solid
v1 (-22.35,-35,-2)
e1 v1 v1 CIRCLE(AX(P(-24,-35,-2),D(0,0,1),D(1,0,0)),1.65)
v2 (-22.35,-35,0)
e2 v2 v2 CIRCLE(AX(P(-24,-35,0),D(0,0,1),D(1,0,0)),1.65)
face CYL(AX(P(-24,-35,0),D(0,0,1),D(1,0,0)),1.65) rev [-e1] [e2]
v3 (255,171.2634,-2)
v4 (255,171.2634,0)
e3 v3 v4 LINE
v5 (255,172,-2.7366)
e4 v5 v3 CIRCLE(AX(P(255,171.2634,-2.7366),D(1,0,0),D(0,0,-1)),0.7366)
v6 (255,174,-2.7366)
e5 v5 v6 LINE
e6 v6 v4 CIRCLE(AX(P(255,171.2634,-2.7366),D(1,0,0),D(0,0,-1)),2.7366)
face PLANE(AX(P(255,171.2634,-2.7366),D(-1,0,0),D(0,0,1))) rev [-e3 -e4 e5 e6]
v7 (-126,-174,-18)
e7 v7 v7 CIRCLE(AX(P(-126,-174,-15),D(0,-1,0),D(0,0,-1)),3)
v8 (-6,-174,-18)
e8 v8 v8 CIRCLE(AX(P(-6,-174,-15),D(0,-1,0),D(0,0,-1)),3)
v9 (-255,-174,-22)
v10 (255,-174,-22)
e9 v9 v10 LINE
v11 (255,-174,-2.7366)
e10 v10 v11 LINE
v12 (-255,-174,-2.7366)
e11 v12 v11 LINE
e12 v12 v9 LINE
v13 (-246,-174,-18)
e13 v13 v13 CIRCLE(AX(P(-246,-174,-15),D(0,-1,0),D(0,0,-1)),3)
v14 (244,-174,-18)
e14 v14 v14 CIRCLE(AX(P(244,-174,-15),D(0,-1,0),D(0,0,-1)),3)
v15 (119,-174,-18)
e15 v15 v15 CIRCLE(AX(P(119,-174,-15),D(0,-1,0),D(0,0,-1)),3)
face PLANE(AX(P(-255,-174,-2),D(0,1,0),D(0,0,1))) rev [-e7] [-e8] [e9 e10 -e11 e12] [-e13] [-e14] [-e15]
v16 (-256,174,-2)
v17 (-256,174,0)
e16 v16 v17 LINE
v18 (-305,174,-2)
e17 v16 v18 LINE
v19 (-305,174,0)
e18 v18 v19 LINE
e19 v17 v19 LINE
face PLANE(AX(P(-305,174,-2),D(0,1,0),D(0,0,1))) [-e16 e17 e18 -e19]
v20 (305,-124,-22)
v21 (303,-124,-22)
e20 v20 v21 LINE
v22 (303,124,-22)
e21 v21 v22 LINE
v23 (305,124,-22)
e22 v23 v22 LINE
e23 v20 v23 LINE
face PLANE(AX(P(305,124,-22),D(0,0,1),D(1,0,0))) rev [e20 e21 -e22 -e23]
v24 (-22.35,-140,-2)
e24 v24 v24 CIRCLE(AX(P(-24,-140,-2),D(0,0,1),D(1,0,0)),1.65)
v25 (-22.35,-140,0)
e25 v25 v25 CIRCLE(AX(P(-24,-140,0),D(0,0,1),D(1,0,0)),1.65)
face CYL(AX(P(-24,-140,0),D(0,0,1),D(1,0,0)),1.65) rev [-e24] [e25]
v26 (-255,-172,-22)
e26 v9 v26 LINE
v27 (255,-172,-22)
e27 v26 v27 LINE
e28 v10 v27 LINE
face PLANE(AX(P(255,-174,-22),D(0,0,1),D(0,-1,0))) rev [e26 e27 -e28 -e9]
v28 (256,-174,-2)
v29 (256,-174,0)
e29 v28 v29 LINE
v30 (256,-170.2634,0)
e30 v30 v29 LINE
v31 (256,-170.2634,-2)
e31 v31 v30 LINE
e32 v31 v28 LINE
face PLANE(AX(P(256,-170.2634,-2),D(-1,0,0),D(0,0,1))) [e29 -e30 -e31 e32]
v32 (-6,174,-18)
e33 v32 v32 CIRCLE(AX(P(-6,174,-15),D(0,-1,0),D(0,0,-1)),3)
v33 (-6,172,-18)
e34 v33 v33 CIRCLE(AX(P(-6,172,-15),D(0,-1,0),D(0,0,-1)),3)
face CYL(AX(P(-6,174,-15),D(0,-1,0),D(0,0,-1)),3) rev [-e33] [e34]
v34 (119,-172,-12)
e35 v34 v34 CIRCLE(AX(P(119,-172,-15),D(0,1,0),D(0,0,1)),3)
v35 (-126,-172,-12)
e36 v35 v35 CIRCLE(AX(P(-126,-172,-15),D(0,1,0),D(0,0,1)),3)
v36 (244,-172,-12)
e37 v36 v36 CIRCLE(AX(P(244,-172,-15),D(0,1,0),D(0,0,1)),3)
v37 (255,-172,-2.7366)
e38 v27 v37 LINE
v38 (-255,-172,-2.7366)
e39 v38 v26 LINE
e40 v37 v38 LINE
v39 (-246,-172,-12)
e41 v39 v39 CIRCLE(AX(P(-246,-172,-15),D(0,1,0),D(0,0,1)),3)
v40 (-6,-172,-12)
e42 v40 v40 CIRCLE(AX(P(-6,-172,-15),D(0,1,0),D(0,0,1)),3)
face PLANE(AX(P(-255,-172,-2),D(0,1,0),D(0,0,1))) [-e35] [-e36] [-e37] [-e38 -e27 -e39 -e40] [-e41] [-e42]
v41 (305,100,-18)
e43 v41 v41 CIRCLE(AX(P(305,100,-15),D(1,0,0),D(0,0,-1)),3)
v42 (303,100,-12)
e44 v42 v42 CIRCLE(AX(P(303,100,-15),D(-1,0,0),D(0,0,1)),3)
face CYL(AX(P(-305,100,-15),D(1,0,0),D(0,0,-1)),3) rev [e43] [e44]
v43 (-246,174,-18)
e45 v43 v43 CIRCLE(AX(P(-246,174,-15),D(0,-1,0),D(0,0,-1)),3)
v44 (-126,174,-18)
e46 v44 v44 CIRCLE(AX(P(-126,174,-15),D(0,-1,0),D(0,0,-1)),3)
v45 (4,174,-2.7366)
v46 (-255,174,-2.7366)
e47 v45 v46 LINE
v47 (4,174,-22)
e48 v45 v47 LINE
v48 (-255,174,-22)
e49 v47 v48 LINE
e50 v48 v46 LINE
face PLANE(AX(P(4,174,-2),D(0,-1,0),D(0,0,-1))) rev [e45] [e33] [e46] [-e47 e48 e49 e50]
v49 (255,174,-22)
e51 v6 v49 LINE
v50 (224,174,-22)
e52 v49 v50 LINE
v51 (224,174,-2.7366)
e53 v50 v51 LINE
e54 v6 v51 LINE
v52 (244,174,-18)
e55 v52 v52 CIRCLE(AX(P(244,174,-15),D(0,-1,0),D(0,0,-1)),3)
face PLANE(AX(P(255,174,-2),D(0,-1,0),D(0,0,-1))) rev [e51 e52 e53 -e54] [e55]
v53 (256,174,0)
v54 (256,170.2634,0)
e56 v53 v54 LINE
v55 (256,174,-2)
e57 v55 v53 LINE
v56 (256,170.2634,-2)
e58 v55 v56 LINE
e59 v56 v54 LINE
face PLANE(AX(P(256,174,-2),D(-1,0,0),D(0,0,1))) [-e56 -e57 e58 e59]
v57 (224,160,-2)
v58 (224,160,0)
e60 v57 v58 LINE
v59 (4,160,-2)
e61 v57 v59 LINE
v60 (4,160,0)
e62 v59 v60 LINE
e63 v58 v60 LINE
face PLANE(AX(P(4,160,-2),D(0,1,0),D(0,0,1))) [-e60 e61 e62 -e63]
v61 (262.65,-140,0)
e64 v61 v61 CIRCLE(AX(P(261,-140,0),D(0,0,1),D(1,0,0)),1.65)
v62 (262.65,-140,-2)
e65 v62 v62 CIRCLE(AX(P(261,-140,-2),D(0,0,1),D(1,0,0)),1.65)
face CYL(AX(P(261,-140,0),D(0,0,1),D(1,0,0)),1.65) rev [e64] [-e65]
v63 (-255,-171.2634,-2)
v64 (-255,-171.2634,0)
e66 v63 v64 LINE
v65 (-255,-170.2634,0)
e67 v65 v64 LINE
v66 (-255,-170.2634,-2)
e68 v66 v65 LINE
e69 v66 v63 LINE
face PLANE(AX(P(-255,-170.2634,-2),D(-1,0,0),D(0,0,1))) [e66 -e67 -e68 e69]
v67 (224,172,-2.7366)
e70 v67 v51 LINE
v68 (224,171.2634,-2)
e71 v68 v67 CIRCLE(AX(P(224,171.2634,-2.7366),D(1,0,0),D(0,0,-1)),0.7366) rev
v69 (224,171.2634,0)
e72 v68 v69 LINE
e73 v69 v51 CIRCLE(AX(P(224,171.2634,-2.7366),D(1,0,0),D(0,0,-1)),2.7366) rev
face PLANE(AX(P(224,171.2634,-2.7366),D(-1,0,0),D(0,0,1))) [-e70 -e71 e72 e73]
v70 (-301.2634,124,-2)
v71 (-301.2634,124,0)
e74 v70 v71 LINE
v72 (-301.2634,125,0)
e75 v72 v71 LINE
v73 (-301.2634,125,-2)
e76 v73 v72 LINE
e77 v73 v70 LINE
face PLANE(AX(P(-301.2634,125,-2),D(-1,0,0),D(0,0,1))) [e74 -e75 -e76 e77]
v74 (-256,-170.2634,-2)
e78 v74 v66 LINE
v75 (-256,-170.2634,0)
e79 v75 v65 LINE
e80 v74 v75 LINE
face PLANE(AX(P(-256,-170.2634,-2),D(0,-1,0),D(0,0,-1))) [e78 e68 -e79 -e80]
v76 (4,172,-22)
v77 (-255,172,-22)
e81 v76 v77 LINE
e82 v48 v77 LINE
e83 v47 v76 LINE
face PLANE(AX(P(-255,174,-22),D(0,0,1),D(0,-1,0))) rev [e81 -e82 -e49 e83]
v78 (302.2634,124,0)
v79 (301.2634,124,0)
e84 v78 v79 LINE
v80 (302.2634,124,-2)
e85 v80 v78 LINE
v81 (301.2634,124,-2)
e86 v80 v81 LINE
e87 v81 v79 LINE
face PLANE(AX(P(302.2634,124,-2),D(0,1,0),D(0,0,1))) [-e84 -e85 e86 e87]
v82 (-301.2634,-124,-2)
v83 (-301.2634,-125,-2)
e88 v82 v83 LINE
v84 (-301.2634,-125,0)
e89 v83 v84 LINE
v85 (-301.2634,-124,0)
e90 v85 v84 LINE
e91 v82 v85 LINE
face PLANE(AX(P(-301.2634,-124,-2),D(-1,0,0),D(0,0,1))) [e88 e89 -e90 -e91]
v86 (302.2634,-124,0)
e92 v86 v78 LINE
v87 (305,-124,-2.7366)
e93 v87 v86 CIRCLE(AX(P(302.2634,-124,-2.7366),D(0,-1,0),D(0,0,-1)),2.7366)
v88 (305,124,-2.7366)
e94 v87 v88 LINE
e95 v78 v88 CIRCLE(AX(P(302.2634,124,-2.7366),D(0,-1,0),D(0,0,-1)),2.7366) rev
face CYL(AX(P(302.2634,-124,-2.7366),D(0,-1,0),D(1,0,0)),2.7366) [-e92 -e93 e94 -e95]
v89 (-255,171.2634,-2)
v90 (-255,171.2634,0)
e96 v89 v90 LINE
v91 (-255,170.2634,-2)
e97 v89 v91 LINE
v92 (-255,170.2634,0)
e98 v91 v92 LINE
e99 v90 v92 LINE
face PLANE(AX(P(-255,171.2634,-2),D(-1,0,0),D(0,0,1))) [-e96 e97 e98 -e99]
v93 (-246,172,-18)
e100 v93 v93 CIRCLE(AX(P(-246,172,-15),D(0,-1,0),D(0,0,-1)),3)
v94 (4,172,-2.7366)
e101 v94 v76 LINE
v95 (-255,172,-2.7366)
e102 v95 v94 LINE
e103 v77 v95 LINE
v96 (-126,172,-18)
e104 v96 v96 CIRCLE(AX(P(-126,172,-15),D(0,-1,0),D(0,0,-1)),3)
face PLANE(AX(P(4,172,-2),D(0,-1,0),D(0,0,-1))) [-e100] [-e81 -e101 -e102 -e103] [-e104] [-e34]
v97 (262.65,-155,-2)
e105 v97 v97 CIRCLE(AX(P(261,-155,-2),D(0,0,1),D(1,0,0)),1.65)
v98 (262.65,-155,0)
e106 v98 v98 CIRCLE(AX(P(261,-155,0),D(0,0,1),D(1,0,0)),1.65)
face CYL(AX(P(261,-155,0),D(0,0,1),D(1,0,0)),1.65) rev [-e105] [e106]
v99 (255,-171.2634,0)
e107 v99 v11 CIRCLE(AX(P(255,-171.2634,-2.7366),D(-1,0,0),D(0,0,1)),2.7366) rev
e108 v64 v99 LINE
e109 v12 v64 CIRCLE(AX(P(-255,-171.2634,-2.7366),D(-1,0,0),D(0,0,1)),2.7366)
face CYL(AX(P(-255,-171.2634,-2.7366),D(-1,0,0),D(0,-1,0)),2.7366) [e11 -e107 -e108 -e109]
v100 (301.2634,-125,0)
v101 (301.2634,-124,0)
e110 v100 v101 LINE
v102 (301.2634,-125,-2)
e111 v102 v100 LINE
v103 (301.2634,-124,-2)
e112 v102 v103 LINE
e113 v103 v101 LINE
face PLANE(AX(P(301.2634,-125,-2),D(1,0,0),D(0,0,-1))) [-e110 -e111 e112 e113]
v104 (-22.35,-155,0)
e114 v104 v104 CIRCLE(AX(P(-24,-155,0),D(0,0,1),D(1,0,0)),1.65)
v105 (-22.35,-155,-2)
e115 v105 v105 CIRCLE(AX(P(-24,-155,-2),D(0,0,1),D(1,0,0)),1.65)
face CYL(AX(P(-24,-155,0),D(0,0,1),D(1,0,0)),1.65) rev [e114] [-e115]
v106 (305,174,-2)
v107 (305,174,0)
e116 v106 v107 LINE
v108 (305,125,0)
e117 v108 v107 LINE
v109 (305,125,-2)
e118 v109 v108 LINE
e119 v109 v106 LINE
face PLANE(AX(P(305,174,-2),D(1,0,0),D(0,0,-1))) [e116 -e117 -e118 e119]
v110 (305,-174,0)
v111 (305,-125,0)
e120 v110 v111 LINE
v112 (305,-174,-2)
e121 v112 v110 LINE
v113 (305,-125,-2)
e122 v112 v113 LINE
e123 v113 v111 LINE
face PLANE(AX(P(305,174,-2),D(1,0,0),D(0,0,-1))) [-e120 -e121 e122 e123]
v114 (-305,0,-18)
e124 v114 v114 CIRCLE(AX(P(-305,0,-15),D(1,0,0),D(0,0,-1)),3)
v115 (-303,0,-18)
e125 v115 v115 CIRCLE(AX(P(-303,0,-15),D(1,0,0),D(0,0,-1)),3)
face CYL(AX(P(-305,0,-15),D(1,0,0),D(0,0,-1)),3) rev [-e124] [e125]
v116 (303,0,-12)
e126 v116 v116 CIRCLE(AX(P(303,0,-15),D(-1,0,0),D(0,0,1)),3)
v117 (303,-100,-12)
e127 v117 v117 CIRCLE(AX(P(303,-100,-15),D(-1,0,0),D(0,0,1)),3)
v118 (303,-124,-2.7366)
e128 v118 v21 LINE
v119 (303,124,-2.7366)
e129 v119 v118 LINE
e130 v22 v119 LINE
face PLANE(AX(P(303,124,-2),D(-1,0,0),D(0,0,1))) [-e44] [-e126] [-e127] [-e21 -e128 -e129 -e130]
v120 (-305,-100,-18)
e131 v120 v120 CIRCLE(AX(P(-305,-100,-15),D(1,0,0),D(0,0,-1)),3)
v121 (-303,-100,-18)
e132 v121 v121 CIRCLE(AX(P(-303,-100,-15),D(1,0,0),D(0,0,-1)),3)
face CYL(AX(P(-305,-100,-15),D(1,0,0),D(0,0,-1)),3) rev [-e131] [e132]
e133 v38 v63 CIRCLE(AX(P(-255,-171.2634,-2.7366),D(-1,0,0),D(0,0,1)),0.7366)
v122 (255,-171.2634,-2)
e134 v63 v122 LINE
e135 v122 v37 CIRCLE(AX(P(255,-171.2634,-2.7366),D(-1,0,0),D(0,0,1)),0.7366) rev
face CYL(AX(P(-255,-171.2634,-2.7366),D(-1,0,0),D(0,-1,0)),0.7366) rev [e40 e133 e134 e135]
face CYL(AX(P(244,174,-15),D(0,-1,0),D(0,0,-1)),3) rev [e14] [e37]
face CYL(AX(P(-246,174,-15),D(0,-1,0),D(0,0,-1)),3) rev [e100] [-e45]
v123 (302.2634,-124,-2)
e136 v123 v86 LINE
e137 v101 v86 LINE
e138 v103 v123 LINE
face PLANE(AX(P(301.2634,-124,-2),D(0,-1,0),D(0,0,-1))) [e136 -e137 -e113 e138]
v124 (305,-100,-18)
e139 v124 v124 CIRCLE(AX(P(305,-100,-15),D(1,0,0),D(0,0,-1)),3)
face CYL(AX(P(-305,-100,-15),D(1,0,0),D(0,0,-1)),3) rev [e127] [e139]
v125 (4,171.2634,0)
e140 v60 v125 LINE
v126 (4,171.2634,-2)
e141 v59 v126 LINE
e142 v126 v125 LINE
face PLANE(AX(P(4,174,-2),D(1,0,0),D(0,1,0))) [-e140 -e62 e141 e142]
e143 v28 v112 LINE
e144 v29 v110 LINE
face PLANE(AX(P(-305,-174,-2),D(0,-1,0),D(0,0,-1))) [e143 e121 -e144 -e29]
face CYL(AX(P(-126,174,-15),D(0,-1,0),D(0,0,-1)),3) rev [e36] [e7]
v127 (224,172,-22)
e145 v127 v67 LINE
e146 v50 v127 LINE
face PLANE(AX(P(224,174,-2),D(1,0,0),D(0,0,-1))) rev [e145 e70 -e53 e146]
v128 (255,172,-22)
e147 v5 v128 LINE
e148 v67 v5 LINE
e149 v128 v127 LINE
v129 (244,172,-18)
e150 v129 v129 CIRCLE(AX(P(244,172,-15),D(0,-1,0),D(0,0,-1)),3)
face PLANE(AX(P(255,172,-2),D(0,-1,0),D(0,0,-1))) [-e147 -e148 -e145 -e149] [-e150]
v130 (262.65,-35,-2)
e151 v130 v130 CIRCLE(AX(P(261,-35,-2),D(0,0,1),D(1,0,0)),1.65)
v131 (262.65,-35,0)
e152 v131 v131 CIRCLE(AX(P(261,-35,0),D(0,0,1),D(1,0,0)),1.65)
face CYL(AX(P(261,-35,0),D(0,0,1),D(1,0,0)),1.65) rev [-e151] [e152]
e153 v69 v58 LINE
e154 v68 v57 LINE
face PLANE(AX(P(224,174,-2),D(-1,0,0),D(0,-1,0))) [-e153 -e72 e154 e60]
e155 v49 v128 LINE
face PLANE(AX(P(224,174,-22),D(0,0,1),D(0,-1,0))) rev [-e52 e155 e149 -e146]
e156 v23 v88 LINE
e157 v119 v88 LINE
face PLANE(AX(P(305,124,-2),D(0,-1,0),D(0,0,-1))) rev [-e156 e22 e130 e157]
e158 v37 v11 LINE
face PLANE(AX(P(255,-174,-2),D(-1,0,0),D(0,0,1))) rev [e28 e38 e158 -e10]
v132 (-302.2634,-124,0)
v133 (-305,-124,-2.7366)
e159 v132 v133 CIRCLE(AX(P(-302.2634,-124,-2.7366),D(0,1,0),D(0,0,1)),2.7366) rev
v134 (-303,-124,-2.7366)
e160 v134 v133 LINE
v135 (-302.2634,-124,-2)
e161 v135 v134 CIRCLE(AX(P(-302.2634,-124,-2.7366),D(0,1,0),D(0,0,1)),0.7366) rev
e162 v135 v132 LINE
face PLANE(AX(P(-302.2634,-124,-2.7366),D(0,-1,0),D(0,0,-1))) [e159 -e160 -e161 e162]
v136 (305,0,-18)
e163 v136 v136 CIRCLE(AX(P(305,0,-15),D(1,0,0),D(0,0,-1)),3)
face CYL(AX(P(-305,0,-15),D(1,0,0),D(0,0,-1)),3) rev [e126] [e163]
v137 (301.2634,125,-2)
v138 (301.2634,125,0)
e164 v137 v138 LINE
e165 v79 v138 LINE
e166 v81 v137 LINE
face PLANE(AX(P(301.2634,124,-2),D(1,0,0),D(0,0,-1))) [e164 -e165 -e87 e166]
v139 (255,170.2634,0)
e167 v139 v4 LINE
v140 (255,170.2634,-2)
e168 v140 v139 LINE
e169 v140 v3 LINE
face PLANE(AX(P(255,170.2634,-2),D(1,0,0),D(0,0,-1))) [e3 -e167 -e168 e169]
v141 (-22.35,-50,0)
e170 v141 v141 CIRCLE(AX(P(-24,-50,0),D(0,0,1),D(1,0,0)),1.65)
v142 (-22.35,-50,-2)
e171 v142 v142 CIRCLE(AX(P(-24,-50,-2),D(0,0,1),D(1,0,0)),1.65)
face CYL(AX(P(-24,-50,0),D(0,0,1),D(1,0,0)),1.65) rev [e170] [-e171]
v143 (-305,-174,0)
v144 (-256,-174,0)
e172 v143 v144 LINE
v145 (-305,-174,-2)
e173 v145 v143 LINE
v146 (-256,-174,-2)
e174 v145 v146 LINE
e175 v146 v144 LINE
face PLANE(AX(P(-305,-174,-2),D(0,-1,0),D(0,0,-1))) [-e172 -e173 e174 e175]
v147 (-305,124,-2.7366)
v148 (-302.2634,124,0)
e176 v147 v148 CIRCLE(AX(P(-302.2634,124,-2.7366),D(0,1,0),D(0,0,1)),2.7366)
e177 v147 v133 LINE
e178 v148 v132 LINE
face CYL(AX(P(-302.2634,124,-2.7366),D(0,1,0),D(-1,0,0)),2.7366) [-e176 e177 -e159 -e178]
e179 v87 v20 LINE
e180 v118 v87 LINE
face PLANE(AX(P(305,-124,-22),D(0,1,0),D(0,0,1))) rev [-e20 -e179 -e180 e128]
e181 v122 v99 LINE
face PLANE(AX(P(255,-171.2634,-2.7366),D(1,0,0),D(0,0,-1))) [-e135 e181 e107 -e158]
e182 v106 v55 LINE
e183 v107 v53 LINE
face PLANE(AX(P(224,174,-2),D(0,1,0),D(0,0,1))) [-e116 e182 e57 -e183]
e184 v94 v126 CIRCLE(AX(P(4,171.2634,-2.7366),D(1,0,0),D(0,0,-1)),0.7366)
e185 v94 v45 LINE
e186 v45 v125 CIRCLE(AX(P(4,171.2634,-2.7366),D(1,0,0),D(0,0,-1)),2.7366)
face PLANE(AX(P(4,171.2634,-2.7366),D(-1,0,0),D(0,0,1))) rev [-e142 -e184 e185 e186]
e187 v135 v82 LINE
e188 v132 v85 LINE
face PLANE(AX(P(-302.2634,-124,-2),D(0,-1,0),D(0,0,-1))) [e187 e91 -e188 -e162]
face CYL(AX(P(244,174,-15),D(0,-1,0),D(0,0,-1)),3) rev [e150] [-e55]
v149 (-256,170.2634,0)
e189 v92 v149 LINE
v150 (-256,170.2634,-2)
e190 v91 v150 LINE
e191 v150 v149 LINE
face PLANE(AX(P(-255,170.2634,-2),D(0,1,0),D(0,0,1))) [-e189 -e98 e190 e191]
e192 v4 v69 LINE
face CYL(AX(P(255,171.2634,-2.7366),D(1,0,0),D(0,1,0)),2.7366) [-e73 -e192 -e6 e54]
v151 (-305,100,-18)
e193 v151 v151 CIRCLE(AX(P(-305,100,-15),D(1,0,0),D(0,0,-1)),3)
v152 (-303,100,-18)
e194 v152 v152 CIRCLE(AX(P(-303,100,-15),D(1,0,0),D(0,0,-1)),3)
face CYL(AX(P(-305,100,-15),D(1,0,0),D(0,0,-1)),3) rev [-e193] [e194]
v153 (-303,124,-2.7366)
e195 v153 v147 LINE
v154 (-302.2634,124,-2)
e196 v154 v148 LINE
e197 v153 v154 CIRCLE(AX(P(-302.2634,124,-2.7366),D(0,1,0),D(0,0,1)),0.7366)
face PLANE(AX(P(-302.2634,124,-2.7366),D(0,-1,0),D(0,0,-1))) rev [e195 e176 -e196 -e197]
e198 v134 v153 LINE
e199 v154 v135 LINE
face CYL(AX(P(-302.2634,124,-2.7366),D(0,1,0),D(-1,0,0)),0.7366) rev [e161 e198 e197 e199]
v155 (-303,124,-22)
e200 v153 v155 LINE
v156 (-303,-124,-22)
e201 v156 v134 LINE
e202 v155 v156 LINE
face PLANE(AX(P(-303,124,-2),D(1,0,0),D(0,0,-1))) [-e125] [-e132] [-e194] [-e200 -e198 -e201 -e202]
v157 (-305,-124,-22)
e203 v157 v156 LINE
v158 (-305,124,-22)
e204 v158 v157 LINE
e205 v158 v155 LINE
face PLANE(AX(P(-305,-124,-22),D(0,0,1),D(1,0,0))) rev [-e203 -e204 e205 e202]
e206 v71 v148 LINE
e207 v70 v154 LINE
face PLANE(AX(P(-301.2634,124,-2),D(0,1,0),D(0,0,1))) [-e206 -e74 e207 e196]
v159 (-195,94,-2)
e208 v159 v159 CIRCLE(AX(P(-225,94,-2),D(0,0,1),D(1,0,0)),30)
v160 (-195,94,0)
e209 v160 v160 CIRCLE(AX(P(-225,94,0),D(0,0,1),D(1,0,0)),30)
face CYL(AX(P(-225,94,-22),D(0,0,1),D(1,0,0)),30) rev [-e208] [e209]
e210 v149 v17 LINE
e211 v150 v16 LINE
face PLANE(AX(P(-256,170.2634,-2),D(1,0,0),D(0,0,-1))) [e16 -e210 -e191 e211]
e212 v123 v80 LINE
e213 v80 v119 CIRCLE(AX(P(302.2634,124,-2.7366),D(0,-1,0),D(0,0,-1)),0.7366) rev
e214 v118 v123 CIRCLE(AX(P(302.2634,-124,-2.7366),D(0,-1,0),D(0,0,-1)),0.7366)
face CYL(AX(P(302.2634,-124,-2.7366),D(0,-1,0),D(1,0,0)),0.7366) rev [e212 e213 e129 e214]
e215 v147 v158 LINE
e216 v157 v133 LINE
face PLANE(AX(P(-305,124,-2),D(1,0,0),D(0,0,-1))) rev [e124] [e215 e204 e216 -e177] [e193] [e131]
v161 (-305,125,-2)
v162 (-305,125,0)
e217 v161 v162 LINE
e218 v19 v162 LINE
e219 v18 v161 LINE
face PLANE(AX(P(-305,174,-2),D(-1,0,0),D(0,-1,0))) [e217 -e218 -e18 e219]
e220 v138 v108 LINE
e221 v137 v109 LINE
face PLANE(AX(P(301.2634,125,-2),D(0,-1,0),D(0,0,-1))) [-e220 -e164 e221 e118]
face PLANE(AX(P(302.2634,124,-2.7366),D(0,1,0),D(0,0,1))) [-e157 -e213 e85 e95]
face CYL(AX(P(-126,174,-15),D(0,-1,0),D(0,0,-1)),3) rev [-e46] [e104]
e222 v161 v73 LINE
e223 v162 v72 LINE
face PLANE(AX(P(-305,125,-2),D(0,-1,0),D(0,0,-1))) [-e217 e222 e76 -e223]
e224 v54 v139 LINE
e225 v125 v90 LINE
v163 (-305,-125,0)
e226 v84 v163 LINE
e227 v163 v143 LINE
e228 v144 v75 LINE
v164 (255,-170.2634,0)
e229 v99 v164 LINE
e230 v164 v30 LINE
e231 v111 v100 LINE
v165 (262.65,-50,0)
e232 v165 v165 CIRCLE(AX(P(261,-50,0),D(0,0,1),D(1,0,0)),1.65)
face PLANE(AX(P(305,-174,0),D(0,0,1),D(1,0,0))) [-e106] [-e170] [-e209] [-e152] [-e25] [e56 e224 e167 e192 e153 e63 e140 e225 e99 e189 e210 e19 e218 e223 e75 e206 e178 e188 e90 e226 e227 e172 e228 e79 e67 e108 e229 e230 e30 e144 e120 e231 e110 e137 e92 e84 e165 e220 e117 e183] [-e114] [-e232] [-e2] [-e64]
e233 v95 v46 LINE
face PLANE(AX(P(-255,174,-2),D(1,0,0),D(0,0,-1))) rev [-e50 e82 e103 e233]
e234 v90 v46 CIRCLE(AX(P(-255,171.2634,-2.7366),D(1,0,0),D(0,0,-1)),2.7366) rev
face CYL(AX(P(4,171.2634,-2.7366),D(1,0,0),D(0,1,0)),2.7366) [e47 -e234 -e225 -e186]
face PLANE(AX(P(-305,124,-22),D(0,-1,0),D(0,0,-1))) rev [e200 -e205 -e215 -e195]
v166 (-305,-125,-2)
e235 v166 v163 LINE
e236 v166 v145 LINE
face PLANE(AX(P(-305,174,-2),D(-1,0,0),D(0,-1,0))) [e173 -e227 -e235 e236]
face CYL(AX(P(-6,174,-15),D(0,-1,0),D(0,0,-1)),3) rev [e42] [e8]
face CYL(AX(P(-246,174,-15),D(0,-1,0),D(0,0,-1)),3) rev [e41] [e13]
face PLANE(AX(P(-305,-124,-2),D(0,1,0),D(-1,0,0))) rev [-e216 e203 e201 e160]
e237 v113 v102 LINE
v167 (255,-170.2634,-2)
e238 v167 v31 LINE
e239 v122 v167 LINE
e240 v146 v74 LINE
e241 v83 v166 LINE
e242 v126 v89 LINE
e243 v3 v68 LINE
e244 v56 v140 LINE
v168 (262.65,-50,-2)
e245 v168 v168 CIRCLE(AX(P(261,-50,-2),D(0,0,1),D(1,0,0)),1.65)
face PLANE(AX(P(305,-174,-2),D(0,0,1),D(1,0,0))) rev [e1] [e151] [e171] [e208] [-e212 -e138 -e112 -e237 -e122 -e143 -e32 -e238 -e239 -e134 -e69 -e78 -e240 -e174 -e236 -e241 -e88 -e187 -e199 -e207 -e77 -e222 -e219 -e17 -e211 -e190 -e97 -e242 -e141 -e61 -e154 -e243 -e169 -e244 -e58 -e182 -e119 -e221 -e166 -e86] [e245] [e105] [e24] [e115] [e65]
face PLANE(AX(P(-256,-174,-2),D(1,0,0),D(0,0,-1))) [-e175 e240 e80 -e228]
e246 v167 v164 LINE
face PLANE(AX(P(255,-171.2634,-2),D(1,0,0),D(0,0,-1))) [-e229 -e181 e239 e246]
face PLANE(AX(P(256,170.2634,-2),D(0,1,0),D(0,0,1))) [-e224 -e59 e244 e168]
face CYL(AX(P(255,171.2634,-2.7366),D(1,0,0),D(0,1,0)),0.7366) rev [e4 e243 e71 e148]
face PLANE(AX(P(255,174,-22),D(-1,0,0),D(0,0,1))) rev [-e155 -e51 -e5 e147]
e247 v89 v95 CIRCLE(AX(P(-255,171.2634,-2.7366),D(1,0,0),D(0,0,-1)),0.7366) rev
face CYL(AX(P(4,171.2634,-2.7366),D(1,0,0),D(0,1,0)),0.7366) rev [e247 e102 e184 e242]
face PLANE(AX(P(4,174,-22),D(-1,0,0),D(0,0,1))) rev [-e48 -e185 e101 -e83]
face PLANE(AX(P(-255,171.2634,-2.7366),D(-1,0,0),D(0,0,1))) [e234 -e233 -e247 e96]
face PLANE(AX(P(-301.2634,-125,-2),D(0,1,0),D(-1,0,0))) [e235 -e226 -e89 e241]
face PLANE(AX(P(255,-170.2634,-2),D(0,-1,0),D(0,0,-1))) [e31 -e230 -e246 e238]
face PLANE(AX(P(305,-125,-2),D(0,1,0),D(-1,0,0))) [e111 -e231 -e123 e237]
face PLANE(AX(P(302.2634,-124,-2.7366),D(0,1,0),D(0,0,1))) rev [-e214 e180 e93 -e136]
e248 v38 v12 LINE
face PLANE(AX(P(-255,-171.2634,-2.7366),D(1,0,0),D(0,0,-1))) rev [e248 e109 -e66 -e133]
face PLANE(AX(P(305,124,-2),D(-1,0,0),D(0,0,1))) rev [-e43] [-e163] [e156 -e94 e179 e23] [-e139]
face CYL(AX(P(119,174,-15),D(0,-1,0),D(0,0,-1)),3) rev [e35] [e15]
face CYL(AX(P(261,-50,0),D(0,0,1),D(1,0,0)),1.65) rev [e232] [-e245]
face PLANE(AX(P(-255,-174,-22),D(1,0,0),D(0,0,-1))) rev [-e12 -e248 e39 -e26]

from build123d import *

# Parameters (mm, degrees)
SM_BASE_FLANGE_1_DEPTH            = 2
SM_EDGE_FLANGE_1_STRIP_W          = 9.4732
SM_EDGE_FLANGE_1_STRIP_H          = 2
SM_EDGE_FLANGE_1_STRIP_CUT_DEPTH  = 248
SM_EDGE_FLANGE_1_RELIEF_W         = 10.4732
SM_EDGE_FLANGE_1_RELIEF_H         = 1
SM_EDGE_FLANGE_1_RELIEF_CUT_DEPTH = 2
SM_EDGE_FLANGE_1_DEPTH            = 248
SM_EDGE_FLANGE_2_STRIP_W          = 9.4732
SM_EDGE_FLANGE_2_STRIP_H          = 2
SM_EDGE_FLANGE_2_STRIP_CUT_DEPTH  = 510
SM_EDGE_FLANGE_2_RELIEF_W         = 10.4732
SM_EDGE_FLANGE_2_RELIEF_H         = 1
SM_EDGE_FLANGE_2_RELIEF_CUT_DEPTH = 2
SM_EDGE_FLANGE_2_DEPTH            = 510
SM_EDGE_FLANGE_3_STRIP_W          = 9.4732
SM_EDGE_FLANGE_3_STRIP_H          = 2
SM_EDGE_FLANGE_3_STRIP_CUT_DEPTH  = 248
SM_EDGE_FLANGE_3_RELIEF_W         = 10.4732
SM_EDGE_FLANGE_3_RELIEF_H         = 1
SM_EDGE_FLANGE_3_RELIEF_CUT_DEPTH = 2
SM_EDGE_FLANGE_3_DEPTH            = 248
SM_EDGE_FLANGE_4_STRIP_W          = 9.4732
SM_EDGE_FLANGE_4_STRIP_H          = 2
SM_EDGE_FLANGE_4_STRIP_CUT_DEPTH  = 31
SM_EDGE_FLANGE_4_RELIEF_W         = 10.4732
SM_EDGE_FLANGE_4_RELIEF_H         = 1
SM_EDGE_FLANGE_4_RELIEF_CUT_DEPTH = 2
SM_EDGE_FLANGE_4_DEPTH            = 31
SM_EDGE_FLANGE_5_STRIP_W          = 9.4732
SM_EDGE_FLANGE_5_STRIP_H          = 2
SM_EDGE_FLANGE_5_STRIP_CUT_DEPTH  = 259
SM_EDGE_FLANGE_5_RELIEF_W         = 10.4732
SM_EDGE_FLANGE_5_RELIEF_H         = 1
SM_EDGE_FLANGE_5_RELIEF_CUT_DEPTH = 2
SM_EDGE_FLANGE_5_DEPTH            = 259
HOLE_WIZARD_M4_1_D                = 3.3
HOLE_WIZARD_M4_1_DEPTH            = 10.1
HOLE_WIZARD_M4_1_TIP              = 0.991420021
SKETCH_20_R                       = 3
CUT_EXTRUDE_1_DEPTH               = 635.712533357
SKETCH_21_R                       = 3
CUT_EXTRUDE_2_DEPTH               = 464.263423983
SKETCH_22_R                       = 30
CUT_EXTRUDE_3_DEPTH               = 352.830925304


# Sheet-metal steps are written as plain solids
with BuildPart() as part:
    # Sketch 1 → 基体-法兰1 (new body)
    with BuildSketch(Plane.XY):
        Polygon((224, 174), (305, 174), (305, -174), (-305, -174), (-305, 174), (4, 174), (4, 160), (224, 160), align=None)
    extrude(amount=-SM_BASE_FLANGE_1_DEPTH)

    # 边线-法兰1 strip (across the edge) → 边线-法兰1 strip cut (cut)
    with BuildSketch(Plane(origin=(305, 124, -2), x_dir=(-1, 0, 0), z_dir=(0, -1, 0))):
        with Locations((-2, -1)):
            Rectangle(SM_EDGE_FLANGE_1_STRIP_W, SM_EDGE_FLANGE_1_STRIP_H)
    extrude(amount=SM_EDGE_FLANGE_1_STRIP_CUT_DEPTH, mode=Mode.SUBTRACT)

    # 边线-法兰1 relief (on the sheet) → 边线-法兰1 relief cut (cut)
    with BuildSketch(Plane(origin=(302.2634, 124, -2), x_dir=(-1, 0, 0), z_dir=(0, 0, -1))):
        with Locations((-4.2366, 0.5)):
            Rectangle(SM_EDGE_FLANGE_1_RELIEF_W, SM_EDGE_FLANGE_1_RELIEF_H)
        with Locations((-4.2366, -248.5)):
            Rectangle(SM_EDGE_FLANGE_1_RELIEF_W, SM_EDGE_FLANGE_1_RELIEF_H)
    extrude(amount=-SM_EDGE_FLANGE_1_RELIEF_CUT_DEPTH, mode=Mode.SUBTRACT)

    # 边线-法兰1 section (across the edge) → 边线-法兰1 (add)
    with BuildSketch(Plane(origin=(305, 124, -2), x_dir=(-1, 0, 0), z_dir=(0, -1, 0))):
        with BuildLine():
            Line((0, 0.7366), (0, 20))
            Line((0, 20), (2, 20))
            Line((2, 20), (2, 0.7366))
            ThreePointArc((2, 0.7366), (2.215745145, 0.215745145), (2.7366, 0))
            Line((2.7366, 0), (2.7366, -2))
            ThreePointArc((2.7366, -2), (0.801531583, -1.198468417), (0, 0.7366))
        make_face()
    extrude(amount=SM_EDGE_FLANGE_1_DEPTH)

    # 边线-法兰2 strip (across the edge) → 边线-法兰2 strip cut (cut)
    with BuildSketch(Plane(origin=(255, -174, -2), x_dir=(0, 1, 0), z_dir=(-1, 0, 0))):
        with Locations((-2, -1)):
            Rectangle(SM_EDGE_FLANGE_2_STRIP_W, SM_EDGE_FLANGE_2_STRIP_H)
    extrude(amount=SM_EDGE_FLANGE_2_STRIP_CUT_DEPTH, mode=Mode.SUBTRACT)

    # 边线-法兰2 relief (on the sheet) → 边线-法兰2 relief cut (cut)
    with BuildSketch(Plane(origin=(255, -171.2634, -2), x_dir=(0, 1, 0), z_dir=(0, 0, -1))):
        with Locations((-4.2366, 0.5)):
            Rectangle(SM_EDGE_FLANGE_2_RELIEF_W, SM_EDGE_FLANGE_2_RELIEF_H)
        with Locations((-4.2366, -510.5)):
            Rectangle(SM_EDGE_FLANGE_2_RELIEF_W, SM_EDGE_FLANGE_2_RELIEF_H)
    extrude(amount=-SM_EDGE_FLANGE_2_RELIEF_CUT_DEPTH, mode=Mode.SUBTRACT)

    # 边线-法兰2 section (across the edge) → 边线-法兰2 (add)
    with BuildSketch(Plane(origin=(255, -174, -2), x_dir=(0, 1, 0), z_dir=(-1, 0, 0))):
        with BuildLine():
            Line((0, 0.7366), (0, 20))
            Line((0, 20), (2, 20))
            Line((2, 20), (2, 0.7366))
            ThreePointArc((2, 0.7366), (2.215745145, 0.215745145), (2.7366, 0))
            Line((2.7366, 0), (2.7366, -2))
            ThreePointArc((2.7366, -2), (0.801531583, -1.198468417), (0, 0.7366))
        make_face()
    extrude(amount=SM_EDGE_FLANGE_2_DEPTH)

    # 边线-法兰3 strip (across the edge) → 边线-法兰3 strip cut (cut)
    with BuildSketch(Plane(origin=(-305, -124, -2), x_dir=(1, 0, 0), z_dir=(0, 1, 0))):
        with Locations((-2, -1)):
            Rectangle(SM_EDGE_FLANGE_3_STRIP_W, SM_EDGE_FLANGE_3_STRIP_H)
    extrude(amount=SM_EDGE_FLANGE_3_STRIP_CUT_DEPTH, mode=Mode.SUBTRACT)

    # 边线-法兰3 relief (on the sheet) → 边线-法兰3 relief cut (cut)
    with BuildSketch(Plane(origin=(-302.2634, -124, -2), x_dir=(1, 0, 0), z_dir=(0, 0, -1))):
        with Locations((-4.2366, 0.5)):
            Rectangle(SM_EDGE_FLANGE_3_RELIEF_W, SM_EDGE_FLANGE_3_RELIEF_H)
        with Locations((-4.2366, -248.5)):
            Rectangle(SM_EDGE_FLANGE_3_RELIEF_W, SM_EDGE_FLANGE_3_RELIEF_H)
    extrude(amount=-SM_EDGE_FLANGE_3_RELIEF_CUT_DEPTH, mode=Mode.SUBTRACT)

    # 边线-法兰3 section (across the edge) → 边线-法兰3 (add)
    with BuildSketch(Plane(origin=(-305, -124, -2), x_dir=(1, 0, 0), z_dir=(0, 1, 0))):
        with BuildLine():
            Line((0, 0.7366), (0, 20))
            Line((0, 20), (2, 20))
            Line((2, 20), (2, 0.7366))
            ThreePointArc((2, 0.7366), (2.215745145, 0.215745145), (2.7366, 0))
            Line((2.7366, 0), (2.7366, -2))
            ThreePointArc((2.7366, -2), (0.801531583, -1.198468417), (0, 0.7366))
        make_face()
    extrude(amount=SM_EDGE_FLANGE_3_DEPTH)

    # 边线-法兰4 strip (across the edge) → 边线-法兰4 strip cut (cut)
    with BuildSketch(Plane(origin=(224, 174, -2), x_dir=(0, -1, 0), z_dir=(1, 0, 0))):
        with Locations((-2, -1)):
            Rectangle(SM_EDGE_FLANGE_4_STRIP_W, SM_EDGE_FLANGE_4_STRIP_H)
    extrude(amount=SM_EDGE_FLANGE_4_STRIP_CUT_DEPTH, mode=Mode.SUBTRACT)

    # 边线-法兰4 relief (on the sheet) → 边线-法兰4 relief cut (cut)
    with BuildSketch(Plane(origin=(224, 171.2634, -2), x_dir=(0, -1, 0), z_dir=(0, 0, -1))):
        with Locations((-4.2366, -31.5)):
            Rectangle(SM_EDGE_FLANGE_4_RELIEF_W, SM_EDGE_FLANGE_4_RELIEF_H)
    extrude(amount=-SM_EDGE_FLANGE_4_RELIEF_CUT_DEPTH, mode=Mode.SUBTRACT)

    # 边线-法兰4 section (across the edge) → 边线-法兰4 (add)
    with BuildSketch(Plane(origin=(224, 174, -2), x_dir=(0, -1, 0), z_dir=(1, 0, 0))):
        with BuildLine():
            Line((0, 0.7366), (0, 20))
            Line((0, 20), (2, 20))
            Line((2, 20), (2, 0.7366))
            ThreePointArc((2, 0.7366), (2.215745145, 0.215745145), (2.7366, 0))
            Line((2.7366, 0), (2.7366, -2))
            ThreePointArc((2.7366, -2), (0.801531583, -1.198468417), (0, 0.7366))
        make_face()
    extrude(amount=SM_EDGE_FLANGE_4_DEPTH)

    # 边线-法兰5 strip (across the edge) → 边线-法兰5 strip cut (cut)
    with BuildSketch(Plane(origin=(-255, 174, -2), x_dir=(0, -1, 0), z_dir=(1, 0, 0))):
        with Locations((-2, -1)):
            Rectangle(SM_EDGE_FLANGE_5_STRIP_W, SM_EDGE_FLANGE_5_STRIP_H)
    extrude(amount=SM_EDGE_FLANGE_5_STRIP_CUT_DEPTH, mode=Mode.SUBTRACT)

    # 边线-法兰5 relief (on the sheet) → 边线-法兰5 relief cut (cut)
    with BuildSketch(Plane(origin=(-255, 171.2634, -2), x_dir=(0, -1, 0), z_dir=(0, 0, -1))):
        with Locations((-4.2366, 0.5)):
            Rectangle(SM_EDGE_FLANGE_5_RELIEF_W, SM_EDGE_FLANGE_5_RELIEF_H)
    extrude(amount=-SM_EDGE_FLANGE_5_RELIEF_CUT_DEPTH, mode=Mode.SUBTRACT)

    # 边线-法兰5 section (across the edge) → 边线-法兰5 (add)
    with BuildSketch(Plane(origin=(-255, 174, -2), x_dir=(0, -1, 0), z_dir=(1, 0, 0))):
        with BuildLine():
            Line((0, 0.7366), (0, 20))
            Line((0, 20), (2, 20))
            Line((2, 20), (2, 0.7366))
            ThreePointArc((2, 0.7366), (2.215745145, 0.215745145), (2.7366, 0))
            Line((2.7366, 0), (2.7366, -2))
            ThreePointArc((2.7366, -2), (0.801531583, -1.198468417), (0, 0.7366))
        make_face()
    extrude(amount=SM_EDGE_FLANGE_5_DEPTH)

    # M4 螺纹孔1
    with Locations(Plane.XY):
        with Locations((-24, -155), (-24, -140), (-24, -50), (-24, -35), (261, -155), (261, -140), (261, -50), (261, -35)):
            Hole(HOLE_WIZARD_M4_1_D / 2, depth=HOLE_WIZARD_M4_1_DEPTH)
            with Locations((0, 0, -(HOLE_WIZARD_M4_1_DEPTH + HOLE_WIZARD_M4_1_TIP / 2))):  # 118° drill point
                Cone(0, HOLE_WIZARD_M4_1_D / 2, HOLE_WIZARD_M4_1_TIP, mode=Mode.SUBTRACT)

    # 草图20 → 切除-拉伸1 (cut, through all)
    with BuildSketch(Plane(origin=(305, 0, 0), x_dir=(0, 0, -1), z_dir=(1, 0, 0))):
        with Locations((15, 0)):
            Circle(SKETCH_20_R)
        with Locations((15, 100)):
            Circle(SKETCH_20_R)
        with Locations((15, -100)):
            Circle(SKETCH_20_R)
    extrude(amount=-CUT_EXTRUDE_1_DEPTH, mode=Mode.SUBTRACT)

    # 草图21 → 切除-拉伸2 (cut, through all)
    with BuildSketch(Plane.XZ.offset(174)):
        with Locations(Location((-246, -15, 0), (0, 0, 270))):
            Circle(SKETCH_21_R)
        with Locations(Location((-126, -15, 0), (0, 0, 270))):
            Circle(SKETCH_21_R)
        with Locations(Location((-6, -15, 0), (0, 0, 270))):
            Circle(SKETCH_21_R)
        with Locations(Location((244, -15, 0), (0, 0, 270))):
            Circle(SKETCH_21_R)
        with Locations(Location((119, -15, 0), (0, 0, 270))):
            Circle(SKETCH_21_R)
    extrude(amount=-CUT_EXTRUDE_2_DEPTH, mode=Mode.SUBTRACT)

    # 草图22 → 切除-拉伸3 (cut, through all)
    with BuildSketch(Plane.XY):
        with Locations((-225, 94)):
            Circle(SKETCH_22_R)
    extrude(amount=-CUT_EXTRUDE_3_DEPTH, mode=Mode.SUBTRACT)


solid = part.part
